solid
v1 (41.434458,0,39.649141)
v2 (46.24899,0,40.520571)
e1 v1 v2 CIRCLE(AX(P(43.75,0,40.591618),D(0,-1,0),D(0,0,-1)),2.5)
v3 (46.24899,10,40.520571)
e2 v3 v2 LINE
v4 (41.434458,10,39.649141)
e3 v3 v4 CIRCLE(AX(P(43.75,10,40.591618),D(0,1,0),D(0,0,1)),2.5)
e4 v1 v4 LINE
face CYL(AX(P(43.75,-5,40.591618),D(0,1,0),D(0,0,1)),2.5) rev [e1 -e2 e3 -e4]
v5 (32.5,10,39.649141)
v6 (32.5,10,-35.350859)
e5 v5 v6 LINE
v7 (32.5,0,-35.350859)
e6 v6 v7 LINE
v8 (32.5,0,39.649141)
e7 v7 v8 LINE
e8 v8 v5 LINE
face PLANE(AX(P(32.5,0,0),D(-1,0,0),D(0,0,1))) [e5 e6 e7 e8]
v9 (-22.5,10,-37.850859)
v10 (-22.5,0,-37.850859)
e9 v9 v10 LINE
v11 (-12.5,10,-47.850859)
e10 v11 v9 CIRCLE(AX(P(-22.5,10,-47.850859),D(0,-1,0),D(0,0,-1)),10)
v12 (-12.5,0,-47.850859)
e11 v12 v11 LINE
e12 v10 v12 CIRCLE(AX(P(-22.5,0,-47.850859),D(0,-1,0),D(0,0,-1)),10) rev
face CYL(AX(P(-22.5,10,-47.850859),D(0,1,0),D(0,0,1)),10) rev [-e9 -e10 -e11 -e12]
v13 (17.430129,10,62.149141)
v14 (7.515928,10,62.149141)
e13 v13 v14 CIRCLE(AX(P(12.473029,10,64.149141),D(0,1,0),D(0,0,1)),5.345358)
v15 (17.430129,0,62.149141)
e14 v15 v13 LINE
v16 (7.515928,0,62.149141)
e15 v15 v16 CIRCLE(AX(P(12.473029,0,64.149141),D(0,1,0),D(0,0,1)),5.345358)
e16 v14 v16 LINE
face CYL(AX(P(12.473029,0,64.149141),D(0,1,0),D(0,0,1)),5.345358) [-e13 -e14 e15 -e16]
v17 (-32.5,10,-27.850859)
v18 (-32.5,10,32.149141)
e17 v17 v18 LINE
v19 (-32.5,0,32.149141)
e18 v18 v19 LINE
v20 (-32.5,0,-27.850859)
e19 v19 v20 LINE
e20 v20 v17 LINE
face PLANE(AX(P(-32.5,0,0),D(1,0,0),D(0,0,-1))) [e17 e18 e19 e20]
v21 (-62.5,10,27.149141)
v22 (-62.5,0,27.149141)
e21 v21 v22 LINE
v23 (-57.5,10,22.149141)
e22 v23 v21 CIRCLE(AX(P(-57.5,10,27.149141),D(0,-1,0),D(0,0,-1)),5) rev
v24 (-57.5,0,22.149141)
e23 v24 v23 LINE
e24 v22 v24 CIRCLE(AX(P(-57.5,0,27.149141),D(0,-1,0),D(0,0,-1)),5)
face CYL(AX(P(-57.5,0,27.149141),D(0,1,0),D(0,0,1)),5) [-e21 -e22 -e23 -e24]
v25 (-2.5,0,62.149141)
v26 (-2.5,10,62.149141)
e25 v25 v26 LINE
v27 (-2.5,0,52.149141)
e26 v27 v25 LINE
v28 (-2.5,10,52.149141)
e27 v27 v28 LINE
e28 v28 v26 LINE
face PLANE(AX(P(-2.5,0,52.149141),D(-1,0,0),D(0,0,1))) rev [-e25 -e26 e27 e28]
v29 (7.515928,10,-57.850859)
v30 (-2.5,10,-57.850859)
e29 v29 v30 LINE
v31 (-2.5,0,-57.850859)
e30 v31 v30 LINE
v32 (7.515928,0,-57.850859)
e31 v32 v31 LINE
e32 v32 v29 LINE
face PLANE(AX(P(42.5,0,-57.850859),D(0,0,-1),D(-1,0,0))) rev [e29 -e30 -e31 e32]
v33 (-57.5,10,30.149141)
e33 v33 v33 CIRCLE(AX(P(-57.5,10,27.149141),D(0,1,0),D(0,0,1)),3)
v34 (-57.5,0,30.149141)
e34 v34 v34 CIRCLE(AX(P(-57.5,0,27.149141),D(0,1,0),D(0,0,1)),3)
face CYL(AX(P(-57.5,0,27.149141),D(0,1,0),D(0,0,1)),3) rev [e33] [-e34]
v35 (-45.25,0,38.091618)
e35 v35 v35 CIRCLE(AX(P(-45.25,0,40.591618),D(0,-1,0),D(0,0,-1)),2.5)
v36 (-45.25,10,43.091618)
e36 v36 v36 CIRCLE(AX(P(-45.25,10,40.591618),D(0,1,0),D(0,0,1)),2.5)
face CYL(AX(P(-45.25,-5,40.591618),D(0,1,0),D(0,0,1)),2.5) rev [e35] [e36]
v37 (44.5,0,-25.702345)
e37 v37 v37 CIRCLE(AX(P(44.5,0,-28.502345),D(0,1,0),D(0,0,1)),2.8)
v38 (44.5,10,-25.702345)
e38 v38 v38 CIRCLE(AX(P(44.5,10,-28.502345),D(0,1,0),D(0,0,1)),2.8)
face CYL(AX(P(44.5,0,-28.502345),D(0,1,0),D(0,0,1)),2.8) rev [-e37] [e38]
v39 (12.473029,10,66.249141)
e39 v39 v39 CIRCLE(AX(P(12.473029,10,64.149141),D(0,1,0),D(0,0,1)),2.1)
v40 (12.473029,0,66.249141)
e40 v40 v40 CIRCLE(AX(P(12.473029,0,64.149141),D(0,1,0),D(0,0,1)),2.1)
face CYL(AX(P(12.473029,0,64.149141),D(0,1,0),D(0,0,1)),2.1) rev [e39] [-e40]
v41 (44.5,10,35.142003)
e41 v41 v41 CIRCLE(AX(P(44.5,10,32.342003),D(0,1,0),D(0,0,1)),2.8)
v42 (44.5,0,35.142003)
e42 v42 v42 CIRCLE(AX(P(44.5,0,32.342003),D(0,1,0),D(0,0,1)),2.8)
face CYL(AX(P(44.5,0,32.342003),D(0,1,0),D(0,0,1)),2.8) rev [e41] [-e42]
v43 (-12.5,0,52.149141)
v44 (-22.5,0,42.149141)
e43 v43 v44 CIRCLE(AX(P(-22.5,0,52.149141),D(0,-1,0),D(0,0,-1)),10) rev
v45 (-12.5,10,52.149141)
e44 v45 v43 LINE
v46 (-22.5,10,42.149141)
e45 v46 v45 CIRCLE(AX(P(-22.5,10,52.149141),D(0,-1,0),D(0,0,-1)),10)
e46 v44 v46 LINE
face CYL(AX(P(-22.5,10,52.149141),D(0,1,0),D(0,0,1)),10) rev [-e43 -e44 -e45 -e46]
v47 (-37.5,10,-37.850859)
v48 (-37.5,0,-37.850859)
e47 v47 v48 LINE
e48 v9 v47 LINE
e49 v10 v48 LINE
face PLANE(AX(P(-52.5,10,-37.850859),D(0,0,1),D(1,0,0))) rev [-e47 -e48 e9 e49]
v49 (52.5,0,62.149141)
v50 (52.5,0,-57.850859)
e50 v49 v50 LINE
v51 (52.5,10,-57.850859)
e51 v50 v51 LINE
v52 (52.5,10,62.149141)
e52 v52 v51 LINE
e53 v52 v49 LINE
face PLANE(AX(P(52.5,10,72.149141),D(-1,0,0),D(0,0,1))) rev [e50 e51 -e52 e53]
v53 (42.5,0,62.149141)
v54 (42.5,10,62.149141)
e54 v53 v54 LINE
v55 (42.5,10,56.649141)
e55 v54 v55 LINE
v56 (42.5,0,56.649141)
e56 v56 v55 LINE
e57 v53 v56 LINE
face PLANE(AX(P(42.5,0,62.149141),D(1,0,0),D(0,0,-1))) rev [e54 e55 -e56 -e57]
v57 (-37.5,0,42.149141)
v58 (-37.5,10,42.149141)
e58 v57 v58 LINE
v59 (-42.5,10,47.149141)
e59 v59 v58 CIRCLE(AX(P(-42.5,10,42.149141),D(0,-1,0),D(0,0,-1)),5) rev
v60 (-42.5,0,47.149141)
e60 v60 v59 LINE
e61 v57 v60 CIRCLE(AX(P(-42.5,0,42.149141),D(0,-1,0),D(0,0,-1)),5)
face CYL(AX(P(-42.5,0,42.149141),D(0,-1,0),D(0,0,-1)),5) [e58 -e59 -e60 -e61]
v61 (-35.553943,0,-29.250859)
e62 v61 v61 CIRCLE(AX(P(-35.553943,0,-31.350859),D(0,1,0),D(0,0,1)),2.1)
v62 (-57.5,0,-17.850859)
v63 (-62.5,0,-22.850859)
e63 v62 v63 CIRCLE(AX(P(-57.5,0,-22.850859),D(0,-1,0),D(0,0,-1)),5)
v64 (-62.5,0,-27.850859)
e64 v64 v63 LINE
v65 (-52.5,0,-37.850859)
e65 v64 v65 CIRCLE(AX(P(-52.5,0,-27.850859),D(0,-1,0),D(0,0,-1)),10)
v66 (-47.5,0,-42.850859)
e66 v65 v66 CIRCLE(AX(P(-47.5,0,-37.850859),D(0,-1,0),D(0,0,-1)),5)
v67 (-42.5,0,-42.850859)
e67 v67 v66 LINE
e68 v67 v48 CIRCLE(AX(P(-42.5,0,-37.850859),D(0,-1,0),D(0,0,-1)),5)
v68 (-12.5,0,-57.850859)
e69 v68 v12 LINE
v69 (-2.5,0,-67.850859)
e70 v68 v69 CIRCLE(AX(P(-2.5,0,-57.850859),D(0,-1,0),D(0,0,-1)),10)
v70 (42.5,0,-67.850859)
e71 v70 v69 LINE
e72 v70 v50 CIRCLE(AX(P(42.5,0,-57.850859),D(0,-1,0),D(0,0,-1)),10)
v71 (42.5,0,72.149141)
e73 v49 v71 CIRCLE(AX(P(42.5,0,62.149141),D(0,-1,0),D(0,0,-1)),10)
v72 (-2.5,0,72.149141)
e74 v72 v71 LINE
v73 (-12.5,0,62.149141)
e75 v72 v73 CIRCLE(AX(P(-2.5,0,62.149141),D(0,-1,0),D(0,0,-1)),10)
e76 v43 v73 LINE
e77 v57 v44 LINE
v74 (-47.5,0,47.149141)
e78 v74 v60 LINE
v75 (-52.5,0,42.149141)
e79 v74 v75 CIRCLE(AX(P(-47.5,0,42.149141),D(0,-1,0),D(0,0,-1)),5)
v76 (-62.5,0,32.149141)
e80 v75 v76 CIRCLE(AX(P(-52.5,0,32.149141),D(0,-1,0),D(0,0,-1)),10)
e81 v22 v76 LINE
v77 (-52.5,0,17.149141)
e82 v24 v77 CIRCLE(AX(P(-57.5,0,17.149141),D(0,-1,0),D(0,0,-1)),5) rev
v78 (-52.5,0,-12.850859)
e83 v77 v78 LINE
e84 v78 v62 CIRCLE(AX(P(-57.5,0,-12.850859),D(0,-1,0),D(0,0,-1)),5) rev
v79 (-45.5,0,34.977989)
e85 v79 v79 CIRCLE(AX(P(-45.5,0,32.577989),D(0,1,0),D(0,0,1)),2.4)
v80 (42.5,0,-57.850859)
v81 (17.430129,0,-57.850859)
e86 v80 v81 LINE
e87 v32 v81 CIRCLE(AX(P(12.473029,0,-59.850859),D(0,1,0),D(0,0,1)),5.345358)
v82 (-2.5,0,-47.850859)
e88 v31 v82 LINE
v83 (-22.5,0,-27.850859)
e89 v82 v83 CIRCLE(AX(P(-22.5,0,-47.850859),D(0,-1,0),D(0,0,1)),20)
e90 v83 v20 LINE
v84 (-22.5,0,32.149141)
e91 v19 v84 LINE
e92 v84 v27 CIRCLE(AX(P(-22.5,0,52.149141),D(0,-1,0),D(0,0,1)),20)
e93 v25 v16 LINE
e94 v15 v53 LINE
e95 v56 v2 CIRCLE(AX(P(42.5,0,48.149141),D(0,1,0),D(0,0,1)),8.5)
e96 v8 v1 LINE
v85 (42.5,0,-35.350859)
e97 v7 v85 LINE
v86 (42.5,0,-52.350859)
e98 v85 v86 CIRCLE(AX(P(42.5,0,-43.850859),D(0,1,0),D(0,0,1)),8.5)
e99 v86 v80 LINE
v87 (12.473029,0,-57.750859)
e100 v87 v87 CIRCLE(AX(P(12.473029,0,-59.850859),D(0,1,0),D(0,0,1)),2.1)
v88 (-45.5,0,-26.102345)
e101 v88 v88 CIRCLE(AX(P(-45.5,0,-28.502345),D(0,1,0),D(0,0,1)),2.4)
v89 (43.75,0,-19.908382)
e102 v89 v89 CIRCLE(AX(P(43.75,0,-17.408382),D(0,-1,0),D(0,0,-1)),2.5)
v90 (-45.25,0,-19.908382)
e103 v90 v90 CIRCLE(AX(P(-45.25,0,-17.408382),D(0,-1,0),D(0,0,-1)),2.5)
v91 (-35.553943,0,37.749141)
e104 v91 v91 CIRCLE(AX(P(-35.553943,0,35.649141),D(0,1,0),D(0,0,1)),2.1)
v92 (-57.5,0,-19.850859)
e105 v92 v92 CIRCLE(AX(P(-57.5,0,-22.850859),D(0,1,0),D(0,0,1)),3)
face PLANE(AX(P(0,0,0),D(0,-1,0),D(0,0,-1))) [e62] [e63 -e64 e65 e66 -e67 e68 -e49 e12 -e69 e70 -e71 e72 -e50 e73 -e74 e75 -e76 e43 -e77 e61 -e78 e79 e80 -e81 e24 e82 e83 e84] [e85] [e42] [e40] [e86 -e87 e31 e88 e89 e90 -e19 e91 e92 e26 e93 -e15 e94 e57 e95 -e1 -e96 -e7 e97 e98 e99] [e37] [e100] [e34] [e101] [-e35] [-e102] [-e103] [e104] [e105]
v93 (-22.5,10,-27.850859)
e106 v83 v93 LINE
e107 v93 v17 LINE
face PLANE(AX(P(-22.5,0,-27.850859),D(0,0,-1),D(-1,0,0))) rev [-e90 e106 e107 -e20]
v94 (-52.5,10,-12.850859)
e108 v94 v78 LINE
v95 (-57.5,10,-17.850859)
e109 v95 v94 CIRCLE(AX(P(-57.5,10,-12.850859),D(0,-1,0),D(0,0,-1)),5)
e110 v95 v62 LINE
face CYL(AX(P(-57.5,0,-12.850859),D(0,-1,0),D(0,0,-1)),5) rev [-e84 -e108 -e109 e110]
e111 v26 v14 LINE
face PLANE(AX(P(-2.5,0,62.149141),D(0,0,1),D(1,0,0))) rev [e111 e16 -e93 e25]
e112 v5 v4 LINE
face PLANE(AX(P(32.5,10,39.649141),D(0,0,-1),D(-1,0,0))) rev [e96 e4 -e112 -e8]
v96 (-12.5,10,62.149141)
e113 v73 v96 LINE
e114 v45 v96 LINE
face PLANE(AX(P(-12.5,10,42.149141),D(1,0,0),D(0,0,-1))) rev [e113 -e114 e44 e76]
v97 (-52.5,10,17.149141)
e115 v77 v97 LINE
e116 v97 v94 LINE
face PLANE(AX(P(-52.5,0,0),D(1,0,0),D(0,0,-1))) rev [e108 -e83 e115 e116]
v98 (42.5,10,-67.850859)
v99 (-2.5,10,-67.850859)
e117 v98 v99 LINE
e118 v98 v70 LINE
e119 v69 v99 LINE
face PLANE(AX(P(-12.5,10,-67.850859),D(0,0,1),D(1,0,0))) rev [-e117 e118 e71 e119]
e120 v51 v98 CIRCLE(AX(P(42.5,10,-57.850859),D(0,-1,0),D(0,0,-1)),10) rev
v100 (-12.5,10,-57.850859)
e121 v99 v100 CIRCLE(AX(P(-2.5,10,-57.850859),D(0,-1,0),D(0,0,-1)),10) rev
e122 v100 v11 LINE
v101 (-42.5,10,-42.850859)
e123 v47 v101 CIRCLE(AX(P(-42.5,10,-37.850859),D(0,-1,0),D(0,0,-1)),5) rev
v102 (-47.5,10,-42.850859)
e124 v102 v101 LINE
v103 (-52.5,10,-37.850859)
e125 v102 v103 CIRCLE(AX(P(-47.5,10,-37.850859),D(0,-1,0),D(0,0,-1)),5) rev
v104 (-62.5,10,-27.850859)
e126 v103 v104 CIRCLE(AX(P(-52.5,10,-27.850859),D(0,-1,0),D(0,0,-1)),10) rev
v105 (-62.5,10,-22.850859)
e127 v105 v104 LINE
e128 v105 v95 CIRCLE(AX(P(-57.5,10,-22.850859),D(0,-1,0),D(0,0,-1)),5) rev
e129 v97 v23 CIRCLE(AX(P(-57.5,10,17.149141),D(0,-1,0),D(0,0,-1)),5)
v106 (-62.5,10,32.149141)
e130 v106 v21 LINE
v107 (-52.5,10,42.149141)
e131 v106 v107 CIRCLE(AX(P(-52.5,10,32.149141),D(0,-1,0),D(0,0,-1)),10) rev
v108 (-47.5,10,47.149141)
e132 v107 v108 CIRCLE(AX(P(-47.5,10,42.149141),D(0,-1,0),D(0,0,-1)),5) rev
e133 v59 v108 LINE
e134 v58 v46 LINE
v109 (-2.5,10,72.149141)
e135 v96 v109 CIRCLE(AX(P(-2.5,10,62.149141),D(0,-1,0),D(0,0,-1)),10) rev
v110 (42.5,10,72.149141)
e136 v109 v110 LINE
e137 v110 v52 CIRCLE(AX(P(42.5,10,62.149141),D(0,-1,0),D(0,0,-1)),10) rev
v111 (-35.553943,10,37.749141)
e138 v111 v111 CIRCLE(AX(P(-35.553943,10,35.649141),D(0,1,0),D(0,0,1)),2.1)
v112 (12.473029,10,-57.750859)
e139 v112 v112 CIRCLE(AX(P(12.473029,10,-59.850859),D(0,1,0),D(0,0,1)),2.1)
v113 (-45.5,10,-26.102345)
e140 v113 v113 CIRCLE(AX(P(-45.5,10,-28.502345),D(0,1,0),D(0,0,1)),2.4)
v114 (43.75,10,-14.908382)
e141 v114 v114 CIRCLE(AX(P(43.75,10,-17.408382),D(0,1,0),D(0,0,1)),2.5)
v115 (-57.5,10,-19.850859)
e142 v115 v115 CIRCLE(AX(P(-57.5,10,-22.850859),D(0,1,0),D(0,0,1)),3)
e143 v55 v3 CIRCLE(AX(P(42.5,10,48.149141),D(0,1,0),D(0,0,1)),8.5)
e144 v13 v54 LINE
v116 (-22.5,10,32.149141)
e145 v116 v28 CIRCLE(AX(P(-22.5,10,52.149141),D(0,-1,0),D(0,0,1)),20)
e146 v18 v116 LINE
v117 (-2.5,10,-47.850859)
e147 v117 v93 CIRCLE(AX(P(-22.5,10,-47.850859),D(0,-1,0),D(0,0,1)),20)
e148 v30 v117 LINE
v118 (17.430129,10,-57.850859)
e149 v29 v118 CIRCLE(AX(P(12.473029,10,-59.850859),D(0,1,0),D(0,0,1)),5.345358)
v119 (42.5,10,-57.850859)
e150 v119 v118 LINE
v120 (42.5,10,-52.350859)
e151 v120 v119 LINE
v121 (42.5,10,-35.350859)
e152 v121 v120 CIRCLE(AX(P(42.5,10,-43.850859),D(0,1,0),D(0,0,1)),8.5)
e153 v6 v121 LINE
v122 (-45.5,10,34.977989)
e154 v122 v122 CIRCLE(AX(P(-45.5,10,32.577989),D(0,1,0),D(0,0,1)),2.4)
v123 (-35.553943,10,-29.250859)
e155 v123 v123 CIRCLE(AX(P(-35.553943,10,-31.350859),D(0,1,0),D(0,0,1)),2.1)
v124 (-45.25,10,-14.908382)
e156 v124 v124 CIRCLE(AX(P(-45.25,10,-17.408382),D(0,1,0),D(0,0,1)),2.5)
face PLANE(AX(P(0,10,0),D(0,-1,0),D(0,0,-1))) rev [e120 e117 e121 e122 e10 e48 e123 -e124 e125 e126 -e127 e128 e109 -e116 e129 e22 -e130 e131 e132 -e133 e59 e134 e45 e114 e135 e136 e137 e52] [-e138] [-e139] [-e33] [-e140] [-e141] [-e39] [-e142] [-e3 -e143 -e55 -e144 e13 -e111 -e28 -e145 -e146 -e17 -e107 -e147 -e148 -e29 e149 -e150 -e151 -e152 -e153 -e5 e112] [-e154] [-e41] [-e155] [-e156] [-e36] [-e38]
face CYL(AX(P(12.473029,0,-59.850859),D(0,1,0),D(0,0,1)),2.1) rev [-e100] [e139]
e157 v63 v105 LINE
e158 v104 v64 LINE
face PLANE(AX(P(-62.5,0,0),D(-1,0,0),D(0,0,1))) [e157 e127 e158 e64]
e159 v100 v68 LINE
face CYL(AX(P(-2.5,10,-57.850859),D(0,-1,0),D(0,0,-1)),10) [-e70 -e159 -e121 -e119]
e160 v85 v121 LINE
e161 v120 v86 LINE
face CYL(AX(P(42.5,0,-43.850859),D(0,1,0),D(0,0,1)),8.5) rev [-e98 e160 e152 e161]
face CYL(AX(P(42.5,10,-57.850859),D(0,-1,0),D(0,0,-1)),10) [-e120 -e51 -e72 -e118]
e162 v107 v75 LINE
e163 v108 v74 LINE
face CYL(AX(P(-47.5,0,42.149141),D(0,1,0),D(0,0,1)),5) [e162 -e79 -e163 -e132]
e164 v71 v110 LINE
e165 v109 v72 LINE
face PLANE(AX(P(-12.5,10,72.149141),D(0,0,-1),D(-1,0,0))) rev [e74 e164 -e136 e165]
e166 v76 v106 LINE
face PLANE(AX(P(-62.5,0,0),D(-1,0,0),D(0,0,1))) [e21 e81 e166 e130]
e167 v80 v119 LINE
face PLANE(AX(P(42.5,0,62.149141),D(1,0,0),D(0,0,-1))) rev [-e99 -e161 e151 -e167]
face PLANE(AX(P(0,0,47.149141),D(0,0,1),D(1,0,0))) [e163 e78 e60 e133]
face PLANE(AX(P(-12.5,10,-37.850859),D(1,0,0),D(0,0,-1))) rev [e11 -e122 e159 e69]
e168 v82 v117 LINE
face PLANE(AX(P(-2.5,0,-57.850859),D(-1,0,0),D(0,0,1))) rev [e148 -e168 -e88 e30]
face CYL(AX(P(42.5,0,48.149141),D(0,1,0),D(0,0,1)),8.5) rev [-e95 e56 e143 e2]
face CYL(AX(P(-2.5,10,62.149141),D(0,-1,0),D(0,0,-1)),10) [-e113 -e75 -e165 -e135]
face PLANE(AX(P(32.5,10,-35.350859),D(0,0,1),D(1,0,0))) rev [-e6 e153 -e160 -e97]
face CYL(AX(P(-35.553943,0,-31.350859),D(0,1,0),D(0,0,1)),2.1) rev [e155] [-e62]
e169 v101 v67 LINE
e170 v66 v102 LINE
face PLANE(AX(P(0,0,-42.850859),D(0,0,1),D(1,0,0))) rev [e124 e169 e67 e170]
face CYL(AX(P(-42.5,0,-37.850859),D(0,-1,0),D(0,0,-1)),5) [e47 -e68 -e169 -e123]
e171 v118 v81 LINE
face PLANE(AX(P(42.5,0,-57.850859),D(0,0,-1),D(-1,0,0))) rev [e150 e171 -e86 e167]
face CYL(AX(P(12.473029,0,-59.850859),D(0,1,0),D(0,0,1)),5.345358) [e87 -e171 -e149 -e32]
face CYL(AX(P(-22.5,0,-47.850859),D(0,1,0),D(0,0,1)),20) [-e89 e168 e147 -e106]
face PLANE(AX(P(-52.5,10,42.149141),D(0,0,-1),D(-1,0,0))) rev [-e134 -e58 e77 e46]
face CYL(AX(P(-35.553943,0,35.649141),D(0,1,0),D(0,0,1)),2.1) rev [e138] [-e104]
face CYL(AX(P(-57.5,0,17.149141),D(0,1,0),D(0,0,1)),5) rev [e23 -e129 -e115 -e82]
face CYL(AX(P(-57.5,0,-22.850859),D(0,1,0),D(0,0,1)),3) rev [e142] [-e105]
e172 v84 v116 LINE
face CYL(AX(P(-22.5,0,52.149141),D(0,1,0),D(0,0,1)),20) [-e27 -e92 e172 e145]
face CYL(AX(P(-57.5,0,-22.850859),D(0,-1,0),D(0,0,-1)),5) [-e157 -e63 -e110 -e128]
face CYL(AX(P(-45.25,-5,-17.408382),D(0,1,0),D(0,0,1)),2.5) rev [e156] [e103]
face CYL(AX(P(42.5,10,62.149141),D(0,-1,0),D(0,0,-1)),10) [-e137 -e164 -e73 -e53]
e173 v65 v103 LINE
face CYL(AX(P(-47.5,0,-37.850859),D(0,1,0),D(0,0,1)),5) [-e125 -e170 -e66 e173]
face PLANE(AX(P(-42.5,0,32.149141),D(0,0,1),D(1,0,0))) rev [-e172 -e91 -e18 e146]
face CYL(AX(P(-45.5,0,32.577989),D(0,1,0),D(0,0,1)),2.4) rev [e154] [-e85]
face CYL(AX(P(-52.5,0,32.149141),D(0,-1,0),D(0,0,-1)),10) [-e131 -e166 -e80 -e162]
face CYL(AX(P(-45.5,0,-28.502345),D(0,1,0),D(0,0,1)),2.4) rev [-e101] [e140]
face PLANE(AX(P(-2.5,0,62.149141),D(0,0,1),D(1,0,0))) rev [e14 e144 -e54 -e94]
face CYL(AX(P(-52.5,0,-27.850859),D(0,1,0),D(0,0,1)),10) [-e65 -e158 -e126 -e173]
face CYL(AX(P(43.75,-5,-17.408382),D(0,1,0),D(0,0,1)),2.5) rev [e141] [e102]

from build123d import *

# Parameters (mm, degrees)
BOSS_EXTRUDE1_DEPTH = 10
FILLET1_R           = 10
FILLET2_R           = 10
FILLET3_R           = 10
CUT_EXTRUDE1_DEPTH  = 10
CUT_EXTRUDE2_DEPTH  = 10
SKETCH5_R           = 5.34535751
BOSS_EXTRUDE2_DEPTH = 10
SKETCH7_R           = 2.1
CUT_EXTRUDE3_DEPTH  = 10
SKETCH13_R          = 2.1
CUT_EXTRUDE4_DEPTH  = 10
SKETCH15_W          = 75
SKETCH15_H          = 10
BOSS_EXTRUDE3_DEPTH = 10
SKETCH18_W          = 60
SKETCH18_H          = 10
BOSS_EXTRUDE4_DEPTH = 10
SKETCH19_R          = 2.4
SKETCH19_R_2        = 2.8
CUT_EXTRUDE6_DEPTH  = 10
SKETCH20_W          = 80
SKETCH20_H          = 10
BOSS_EXTRUDE5_DEPTH = 10
CUT_EXTRUDE7_DEPTH  = 10
FILLET4_R           = 10
SKETCH22_W          = 10
SKETCH22_H          = 20
CUT_EXTRUDE8_DEPTH  = 10
FILLET5_START       = -1
FILLET5_DEPTH       = 12
FILLET5_2_DEPTH     = 10
SKETCH24_W          = 15
SKETCH24_H          = 10
BOSS_EXTRUDE6_DEPTH = 5
SKETCH25_W          = 15
SKETCH25_H          = 10
BOSS_EXTRUDE7_DEPTH = 5
SKETCH26_R          = 2.5
CUT_EXTRUDE9_DEPTH  = 15
FILLET6_R           = 5


with BuildPart() as part:
    # Sketch1 → Boss-Extrude1 (new body)
    with BuildSketch(Plane(origin=(0, 0, 0), x_dir=(1, 0, 0), z_dir=(0, 1, 0))):
        Polygon((-52.5, 37.850859258), (-12.5, 37.850859258), (-12.5, 67.850859258), (52.5, 67.850859258), (52.5, -72.149140742), (-12.5, -72.149140742), (-12.5, -42.149140742), (-52.5, -42.149140742), align=None)
    extrude(amount=BOSS_EXTRUDE1_DEPTH)

    # Fillet1
    fillet1_edges = [part.edges().sort_by_distance(p)[0] for p in [
        (-12.5, 5, 42.149140742),
        (-12.5, 5, -37.850859258),
    ]]
    fillet(fillet1_edges, radius=FILLET1_R)

    # Fillet2
    fillet2_edges = [part.edges().sort_by_distance(p)[0] for p in [
        (-12.5, 5, 72.149140742),
        (-12.5, 5, -67.850859258),
    ]]
    fillet(fillet2_edges, radius=FILLET2_R)

    # Fillet3
    fillet3_edges = [part.edges().sort_by_distance(p)[0] for p in [
        (52.5, 5, 72.149140742),
        (52.5, 5, -67.850859258),
    ]]
    fillet(fillet3_edges, radius=FILLET3_R)

    # Sketch3 → Cut-Extrude1 (cut)
    with BuildSketch(Plane(origin=(0, 10, 0), x_dir=(1, 0, 0), z_dir=(0, 1, 0))):
        with BuildLine():
            ThreePointArc((51, 43.850859258), (48.51040764, 49.861266898), (42.5, 52.350859258))
            Line((42.5, 52.350859258), (42.5, 35.350859258))
            ThreePointArc((42.5, 35.350859258), (48.51040764, 37.840451618), (51, 43.850859258))
        make_face()
        with BuildLine():
            Line((42.5, 35.350859258), (42.5, 52.350859258))
            ThreePointArc((42.5, 52.350859258), (34, 43.850859258), (42.5, 35.350859258))
        make_face()
        with BuildLine():
            ThreePointArc((51, -48.149140742), (48.51040764, -42.138733102), (42.5, -39.649140742))
            Line((42.5, -39.649140742), (42.5, -56.649140742))
            ThreePointArc((42.5, -56.649140742), (48.51040764, -54.159548382), (51, -48.149140742))
        make_face()
        with BuildLine():
            Line((42.5, -56.649140742), (42.5, -39.649140742))
            ThreePointArc((42.5, -39.649140742), (34, -48.149140742), (42.5, -56.649140742))
        make_face()
    extrude(amount=-CUT_EXTRUDE1_DEPTH, mode=Mode.SUBTRACT)

    # Sketch4 → Cut-Extrude2 (cut)
    with BuildSketch(Plane(origin=(0, 10, 0), x_dir=(1, 0, 0), z_dir=(0, 1, 0))):
        with BuildLine():
            Line((-2.5, -62.149140742), (42.5, -62.149140742))
            Line((42.5, -62.149140742), (42.5, 57.850859258))
            Line((42.5, 57.850859258), (-2.5, 57.850859258))
            Line((-2.5, 57.850859258), (-2.5, 47.850859258))
            ThreePointArc((-2.5, 47.850859258), (-8.357864376, 33.708723634), (-22.5, 27.850859258))
            Line((-22.5, 27.850859258), (-42.5, 27.850859258))
            Line((-42.5, 27.850859258), (-42.5, -32.149140742))
            Line((-42.5, -32.149140742), (-22.5, -32.149140742))
            ThreePointArc((-22.5, -32.149140742), (-8.357864376, -38.007005118), (-2.5, -52.149140742))
            Line((-2.5, -52.149140742), (-2.5, -62.149140742))
        make_face()
    extrude(amount=-CUT_EXTRUDE2_DEPTH, mode=Mode.SUBTRACT)

    # Sketch5 → Boss-Extrude2 (add)
    with BuildSketch(Plane(origin=(0, 10, 0), x_dir=(1, 0, 0), z_dir=(0, 1, 0))):
        with Locations((12.473028737, 59.850859258)):
            Circle(SKETCH5_R)
        with Locations((12.473028737, -64.149140742)):
            Circle(SKETCH5_R)
    extrude(amount=-BOSS_EXTRUDE2_DEPTH)

    # Sketch7 → Cut-Extrude3 (cut)
    with BuildSketch(Plane(origin=(0, 10, 0), x_dir=(1, 0, 0), z_dir=(0, 1, 0))):
        with Locations(Location((12.473028737, 59.850859258, 0), (0, 0, 270))):
            Circle(SKETCH7_R)
        with Locations(Location((12.473028737, -64.149140742, 0), (0, 0, 270))):
            Circle(SKETCH7_R)
    extrude(amount=-CUT_EXTRUDE3_DEPTH, mode=Mode.SUBTRACT)

    # Sketch13 → Cut-Extrude4 (cut)
    with BuildSketch(Plane(origin=(0, 10, 0), x_dir=(1, 0, 0), z_dir=(0, 1, 0))):
        with Locations(Location((-35.553942525, -35.649140742, 0), (0, 0, 270))):
            Circle(SKETCH13_R)
        with Locations(Location((-35.553942525, 31.350859258, 0), (0, 0, 270))):
            Circle(SKETCH13_R)
    extrude(amount=-CUT_EXTRUDE4_DEPTH, mode=Mode.SUBTRACT)

    # Sketch15 → Boss-Extrude3 (add)
    with BuildSketch(Plane.ZY.offset(-42.5)):
        with Locations((2.149140742, 5)):
            Rectangle(SKETCH15_W, SKETCH15_H)
    extrude(amount=BOSS_EXTRUDE3_DEPTH)

    # Sketch18 → Boss-Extrude4 (add)
    with BuildSketch(Plane(origin=(-42.5, 0, 0), x_dir=(0, 0, -1), z_dir=(1, 0, 0))):
        with Locations((-2.149140742, 5)):
            Rectangle(SKETCH18_W, SKETCH18_H)
    extrude(amount=BOSS_EXTRUDE4_DEPTH)

    # Sketch19 → Cut-Extrude6 (cut)
    with BuildSketch(Plane(origin=(0, 10, 0), x_dir=(1, 0, 0), z_dir=(0, 1, 0))):
        with Locations(Location((-45.5, 28.502344732, 0), (0, 0, 270))):
            Circle(SKETCH19_R)
        with Locations(Location((-45.5, -32.57798884, 0), (0, 0, 270))):
            Circle(SKETCH19_R)
        with Locations(Location((44.5, -32.342002638, 0), (0, 0, 270))):
            Circle(SKETCH19_R_2)
        with Locations(Location((44.5, 28.502344732, 0), (0, 0, 270))):
            Circle(SKETCH19_R_2)
    extrude(amount=-CUT_EXTRUDE6_DEPTH, mode=Mode.SUBTRACT)

    # Sketch20 → Boss-Extrude5 (add)
    with BuildSketch(Plane.ZY.offset(52.5)):
        with Locations((2.149140742, 5)):
            Rectangle(SKETCH20_W, SKETCH20_H)
    extrude(amount=BOSS_EXTRUDE5_DEPTH)

    # Sketch21 → Cut-Extrude7 (cut)
    with BuildSketch(Plane(origin=(0, 10, 0), x_dir=(1, 0, 0), z_dir=(0, 1, 0))):
        with BuildLine():
            ThreePointArc((-54.5, 22.850859258), (-55.378679656, 24.972179602), (-57.5, 25.850859258))
            Line((-57.5, 25.850859258), (-57.5, 19.850859258))
            ThreePointArc((-57.5, 19.850859258), (-55.378679656, 20.729538915), (-54.5, 22.850859258))
        make_face()
        with BuildLine():
            Line((-57.5, 19.850859258), (-57.5, 25.850859258))
            ThreePointArc((-57.5, 25.850859258), (-60.5, 22.850859258), (-57.5, 19.850859258))
        make_face()
        with BuildLine():
            ThreePointArc((-54.5, -27.149140742), (-55.378679656, -25.027820398), (-57.5, -24.149140742))
            Line((-57.5, -24.149140742), (-57.5, -30.149140742))
            ThreePointArc((-57.5, -30.149140742), (-55.378679656, -29.270461085), (-54.5, -27.149140742))
        make_face()
        with BuildLine():
            Line((-57.5, -30.149140742), (-57.5, -24.149140742))
            ThreePointArc((-57.5, -24.149140742), (-60.5, -27.149140742), (-57.5, -30.149140742))
        make_face()
    extrude(amount=-CUT_EXTRUDE7_DEPTH, mode=Mode.SUBTRACT)

    # Fillet4
    fillet4_edges = [part.edges().sort_by_distance(p)[0] for p in [
        (-62.5, 5, -37.850859258),
        (-62.5, 5, 42.149140742),
    ]]
    fillet(fillet4_edges, radius=FILLET4_R)

    # Sketch22 → Cut-Extrude8 (cut)
    with BuildSketch(Plane(origin=(0, 10, 0), x_dir=(1, 0, 0), z_dir=(0, 1, 0))):
        with Locations((-57.5, 7.850859258)):
            Rectangle(SKETCH22_W, SKETCH22_H)
        with Locations((-57.5, -12.149140742)):
            Rectangle(SKETCH22_W, SKETCH22_H)
    extrude(amount=-CUT_EXTRUDE8_DEPTH, mode=Mode.SUBTRACT)

    # Fillet5: read off the stored shape, not the designer's step
    # Fillet5 outline → Fillet5 (cut)
    with BuildSketch(Plane(origin=(0, 0, 0), x_dir=(1, 0, 0), z_dir=(0, 1, 0)).offset(FILLET5_START)):
        with BuildLine():
            Line((-62.5, 17.850859258), (-57.5, 17.850859258))
            ThreePointArc((-57.5, 17.850859258), (-61.035533906, 19.315325352), (-62.5, 22.850859258))
            Line((-62.5, 22.850859258), (-62.5, 17.850859258))
        make_face()
        with BuildLine():
            ThreePointArc((-62.5, -27.149140742), (-61.035533906, -23.613606836), (-57.5, -22.149140742))
            Line((-57.5, -22.149140742), (-62.5, -22.149140742))
            Line((-62.5, -22.149140742), (-62.5, -27.149140742))
        make_face()
    extrude(amount=FILLET5_DEPTH, mode=Mode.SUBTRACT)

    # Fillet5 2 outline → Fillet5 2 (add)
    with BuildSketch(Plane(origin=(0, 0, 0), x_dir=(1, 0, 0), z_dir=(0, 1, 0))):
        with BuildLine():
            Line((-52.5, 17.850859258), (-57.5, 17.850859258))
            ThreePointArc((-57.5, 17.850859258), (-53.964466094, 16.386393164), (-52.5, 12.850859258))
            Line((-52.5, 12.850859258), (-52.5, 17.850859258))
        make_face()
        with BuildLine():
            Line((-52.5, -22.149140742), (-52.5, -17.149140742))
            ThreePointArc((-52.5, -17.149140742), (-53.964466094, -20.684674648), (-57.5, -22.149140742))
            Line((-57.5, -22.149140742), (-52.5, -22.149140742))
        make_face()
    extrude(amount=FILLET5_2_DEPTH)

    # Sketch24 → Boss-Extrude6 (add)
    with BuildSketch(Plane.XY.offset(42.149140742)):
        with Locations((-45, 5)):
            Rectangle(SKETCH24_W, SKETCH24_H)
    extrude(amount=BOSS_EXTRUDE6_DEPTH)

    # Sketch25 → Boss-Extrude7 (add)
    with BuildSketch(Plane(origin=(0, 0, -37.850859258), x_dir=(-1, 0, 0), z_dir=(0, 0, -1))):
        with Locations((45, 5)):
            Rectangle(SKETCH25_W, SKETCH25_H)
    extrude(amount=BOSS_EXTRUDE7_DEPTH)

    # Sketch26 → Cut-Extrude9 (cut)
    with BuildSketch(Plane(origin=(0, 10, 0), x_dir=(1, 0, 0), z_dir=(0, 1, 0))):
        with Locations(Location((-45.25, 17.408381721, 0), (0, 0, 270))):
            Circle(SKETCH26_R)
        with Locations(Location((-45.25, -40.591618279, 0), (0, 0, 270))):
            Circle(SKETCH26_R)
        with Locations((43.75, -40.591618279)):
            Circle(SKETCH26_R)
        with Locations(Location((43.75, 17.408381721, 0), (0, 0, 270))):
            Circle(SKETCH26_R)
    extrude(amount=-CUT_EXTRUDE9_DEPTH, mode=Mode.SUBTRACT)

    # Fillet6
    fillet6_edges = [part.edges().sort_by_distance(p)[0] for p in [
        (-37.5, 5, 47.149140742),
        (-37.5, 5, -42.850859258),
        (-52.5, 5, -42.850859258),
        (-52.5, 5, 47.149140742),
    ]]
    fillet(fillet6_edges, radius=FILLET6_R - 0.0001)  # a hair under: the kernel refuses the full size


solid = part.part
